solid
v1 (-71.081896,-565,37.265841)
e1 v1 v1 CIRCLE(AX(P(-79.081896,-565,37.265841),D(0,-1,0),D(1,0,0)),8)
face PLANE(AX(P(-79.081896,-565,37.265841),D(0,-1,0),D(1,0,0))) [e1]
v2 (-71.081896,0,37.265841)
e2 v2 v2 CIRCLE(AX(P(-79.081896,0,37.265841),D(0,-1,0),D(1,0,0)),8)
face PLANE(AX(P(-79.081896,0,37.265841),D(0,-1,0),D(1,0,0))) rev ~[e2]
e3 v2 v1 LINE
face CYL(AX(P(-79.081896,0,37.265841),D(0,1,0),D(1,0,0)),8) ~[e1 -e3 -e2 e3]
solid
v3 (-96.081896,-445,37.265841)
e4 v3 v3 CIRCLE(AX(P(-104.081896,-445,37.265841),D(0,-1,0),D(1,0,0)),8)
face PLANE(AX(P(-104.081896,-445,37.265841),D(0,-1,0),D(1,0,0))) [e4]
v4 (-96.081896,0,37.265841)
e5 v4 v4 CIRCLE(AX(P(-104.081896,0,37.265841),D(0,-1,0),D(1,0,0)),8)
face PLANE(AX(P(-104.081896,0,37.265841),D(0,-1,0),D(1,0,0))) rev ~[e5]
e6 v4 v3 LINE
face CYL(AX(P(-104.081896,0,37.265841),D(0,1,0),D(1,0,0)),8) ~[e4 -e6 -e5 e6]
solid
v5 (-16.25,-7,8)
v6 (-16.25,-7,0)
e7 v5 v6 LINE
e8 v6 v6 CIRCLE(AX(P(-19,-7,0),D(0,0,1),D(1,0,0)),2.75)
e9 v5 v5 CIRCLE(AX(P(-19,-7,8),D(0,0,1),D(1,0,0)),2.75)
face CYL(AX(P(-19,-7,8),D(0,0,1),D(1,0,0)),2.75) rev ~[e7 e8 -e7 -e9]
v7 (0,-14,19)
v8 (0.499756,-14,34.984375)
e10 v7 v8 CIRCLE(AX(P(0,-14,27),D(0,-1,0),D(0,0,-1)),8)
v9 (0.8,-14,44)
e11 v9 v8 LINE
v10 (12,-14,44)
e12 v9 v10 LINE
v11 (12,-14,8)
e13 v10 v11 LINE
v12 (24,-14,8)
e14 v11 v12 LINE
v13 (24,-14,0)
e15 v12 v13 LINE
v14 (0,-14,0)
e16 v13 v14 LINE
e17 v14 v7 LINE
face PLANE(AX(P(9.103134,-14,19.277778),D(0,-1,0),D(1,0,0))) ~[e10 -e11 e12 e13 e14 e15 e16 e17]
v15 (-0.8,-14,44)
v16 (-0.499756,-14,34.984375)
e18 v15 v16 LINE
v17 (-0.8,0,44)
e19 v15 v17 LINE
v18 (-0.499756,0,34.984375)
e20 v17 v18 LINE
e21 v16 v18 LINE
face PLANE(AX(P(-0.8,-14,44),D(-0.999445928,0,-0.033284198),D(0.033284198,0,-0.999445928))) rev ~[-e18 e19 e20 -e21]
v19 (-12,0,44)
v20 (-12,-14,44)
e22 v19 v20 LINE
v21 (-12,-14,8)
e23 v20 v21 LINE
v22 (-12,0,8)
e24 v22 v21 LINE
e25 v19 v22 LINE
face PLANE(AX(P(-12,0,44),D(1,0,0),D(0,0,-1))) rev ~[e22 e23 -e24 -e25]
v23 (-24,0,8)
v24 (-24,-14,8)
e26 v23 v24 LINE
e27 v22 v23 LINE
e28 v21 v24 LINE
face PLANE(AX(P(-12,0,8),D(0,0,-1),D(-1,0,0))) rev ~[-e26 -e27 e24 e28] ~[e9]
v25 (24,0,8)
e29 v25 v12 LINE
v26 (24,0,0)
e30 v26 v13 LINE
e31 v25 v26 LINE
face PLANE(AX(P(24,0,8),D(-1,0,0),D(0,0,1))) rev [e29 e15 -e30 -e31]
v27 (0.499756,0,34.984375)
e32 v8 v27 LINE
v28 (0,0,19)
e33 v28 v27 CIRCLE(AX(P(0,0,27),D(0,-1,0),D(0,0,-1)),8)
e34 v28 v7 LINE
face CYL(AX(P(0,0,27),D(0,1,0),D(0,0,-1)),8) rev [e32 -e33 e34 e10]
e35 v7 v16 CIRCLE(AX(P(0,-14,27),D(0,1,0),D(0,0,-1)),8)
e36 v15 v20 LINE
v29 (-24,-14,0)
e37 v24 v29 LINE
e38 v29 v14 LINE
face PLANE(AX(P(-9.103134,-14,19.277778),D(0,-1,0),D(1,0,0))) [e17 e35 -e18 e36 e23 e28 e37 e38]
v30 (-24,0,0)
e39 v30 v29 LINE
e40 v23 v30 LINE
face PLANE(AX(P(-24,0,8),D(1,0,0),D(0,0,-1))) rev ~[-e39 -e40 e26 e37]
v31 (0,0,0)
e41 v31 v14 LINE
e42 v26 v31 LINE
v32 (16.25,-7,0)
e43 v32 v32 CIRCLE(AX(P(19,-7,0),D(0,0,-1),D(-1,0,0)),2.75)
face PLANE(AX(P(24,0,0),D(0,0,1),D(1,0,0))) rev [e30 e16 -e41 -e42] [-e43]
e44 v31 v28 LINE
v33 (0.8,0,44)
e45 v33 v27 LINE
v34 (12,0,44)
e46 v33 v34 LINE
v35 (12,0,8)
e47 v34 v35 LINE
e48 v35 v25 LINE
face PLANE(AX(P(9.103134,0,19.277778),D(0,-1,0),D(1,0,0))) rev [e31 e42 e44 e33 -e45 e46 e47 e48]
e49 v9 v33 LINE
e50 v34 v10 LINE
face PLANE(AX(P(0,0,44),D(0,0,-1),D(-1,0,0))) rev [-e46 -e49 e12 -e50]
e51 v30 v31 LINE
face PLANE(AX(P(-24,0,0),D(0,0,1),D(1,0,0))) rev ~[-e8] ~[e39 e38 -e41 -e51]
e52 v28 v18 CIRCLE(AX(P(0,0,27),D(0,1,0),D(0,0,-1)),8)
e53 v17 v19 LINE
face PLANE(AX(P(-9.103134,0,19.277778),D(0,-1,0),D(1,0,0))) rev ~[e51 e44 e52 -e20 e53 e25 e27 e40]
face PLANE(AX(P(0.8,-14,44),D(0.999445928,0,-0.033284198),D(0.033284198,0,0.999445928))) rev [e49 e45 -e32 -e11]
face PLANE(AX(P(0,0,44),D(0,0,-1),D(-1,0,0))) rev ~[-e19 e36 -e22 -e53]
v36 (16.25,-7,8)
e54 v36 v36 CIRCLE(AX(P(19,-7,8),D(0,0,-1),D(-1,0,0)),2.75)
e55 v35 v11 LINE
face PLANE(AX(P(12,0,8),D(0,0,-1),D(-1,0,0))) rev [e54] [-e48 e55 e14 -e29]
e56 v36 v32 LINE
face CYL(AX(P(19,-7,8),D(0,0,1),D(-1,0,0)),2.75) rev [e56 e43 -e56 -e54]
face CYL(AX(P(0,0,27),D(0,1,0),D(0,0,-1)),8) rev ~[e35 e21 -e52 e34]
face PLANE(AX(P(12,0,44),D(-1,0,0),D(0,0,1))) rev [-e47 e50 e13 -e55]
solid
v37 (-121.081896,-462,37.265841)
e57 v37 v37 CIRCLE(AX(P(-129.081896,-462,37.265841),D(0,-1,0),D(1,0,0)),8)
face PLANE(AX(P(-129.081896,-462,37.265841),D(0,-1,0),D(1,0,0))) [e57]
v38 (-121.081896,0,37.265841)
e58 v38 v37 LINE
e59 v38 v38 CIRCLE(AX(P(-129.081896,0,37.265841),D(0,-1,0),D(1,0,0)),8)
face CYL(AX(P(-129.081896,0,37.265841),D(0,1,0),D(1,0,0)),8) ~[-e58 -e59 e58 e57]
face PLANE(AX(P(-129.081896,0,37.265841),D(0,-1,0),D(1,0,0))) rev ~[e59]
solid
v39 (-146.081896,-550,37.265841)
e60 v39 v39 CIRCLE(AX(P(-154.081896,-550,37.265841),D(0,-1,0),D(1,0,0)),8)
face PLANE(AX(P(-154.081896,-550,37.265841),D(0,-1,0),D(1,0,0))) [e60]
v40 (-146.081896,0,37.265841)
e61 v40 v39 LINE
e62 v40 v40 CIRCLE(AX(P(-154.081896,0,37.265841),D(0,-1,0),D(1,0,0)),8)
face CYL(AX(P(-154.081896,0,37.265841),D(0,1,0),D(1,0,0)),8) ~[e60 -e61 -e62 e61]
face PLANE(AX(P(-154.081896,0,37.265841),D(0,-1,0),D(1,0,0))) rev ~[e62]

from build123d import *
from build123d import SkipClean  # not in build123d's __all__

# Parameters (mm, degrees)
F1_DEPTH  = 14
F2_R      = 2.75
F3_DEPTH  = 25
F5_DEPTH  = 25
F7_R      = 8
F8_DEPTH  = 550
F9_DEPTH  = 462
F10_DEPTH = 445
F11_DEPTH = 565


with BuildPart() as f1:
    # F0 (on Front) → F1 (new body)
    with BuildSketch(Plane.XZ):
        with BuildLine():
            Line((-24, 8), (-24, 0))
            Line((-24, 0), (0, 0))
            Line((0, 0), (0, 19))
            ThreePointArc((0, 19), (-8, 27), (0, 35))
            Line((0, 35), (0, 44))
            Line((0, 44), (-12, 44))
            Line((-12, 44), (-12, 8))
            Line((-12, 8), (-24, 8))
        make_face()
    extrude(amount=F1_DEPTH)

    # F2 (on face) → F3 (cut)
    with BuildSketch(Plane.XY.offset(8)):
        with Locations((-19, -7)):
            Circle(F2_R)
    extrude(amount=-F3_DEPTH, mode=Mode.SUBTRACT)

    # F4 (on face) → F5 (cut)
    with BuildSketch(Plane.XZ.offset(14)):
        with BuildLine():
            Line((0, 44), (-0.8, 44))
            Line((-0.8, 44), (-0.4997557997, 34.984375))
            ThreePointArc((-0.4997557997, 34.984375), (-0.25, 34.9960927959), (0, 35))
            Line((0, 35), (0, 44))
        make_face()
    extrude(amount=-F5_DEPTH, mode=Mode.SUBTRACT)

    # F6: F1 across face


with BuildPart() as f1_1:
    add(f1.part, clean=False)
    with SkipClean():  # cleaning this boolean's faces spoils the solid; the shape is the same uncleaned
        add(f1.part.mirror(Plane(origin=(0, -7, 9.5), x_dir=(0, 1, 0), z_dir=(1, 0, 0))), clean=False)


with BuildPart() as f8:
    # F7 (on Front) → F8 (new body)
    with BuildSketch(Plane.XZ):
        with Locations((-154.0818959475, 37.2658409178)):
            Circle(F7_R)
    extrude(amount=F8_DEPTH)


with BuildPart() as f9:
    # F7 (on Front) → F9 (new body)
    with BuildSketch(Plane.XZ):
        with Locations((-129.0818959475, 37.2658409178)):
            Circle(F7_R)
    extrude(amount=F9_DEPTH)


with BuildPart() as f10:
    # F7 (on Front) → F10 (new body)
    with BuildSketch(Plane.XZ):
        with Locations((-104.0818959475, 37.2658409178)):
            Circle(F7_R)
    extrude(amount=F10_DEPTH)


with BuildPart() as f11:
    # F7 (on Front) → F11 (new body)
    with BuildSketch(Plane.XZ):
        with Locations((-79.0818959475, 37.2658409178)):
            Circle(F7_R)
    extrude(amount=F11_DEPTH)


solid = Compound([f1_1.part, f8.part, f9.part, f10.part, f11.part])
